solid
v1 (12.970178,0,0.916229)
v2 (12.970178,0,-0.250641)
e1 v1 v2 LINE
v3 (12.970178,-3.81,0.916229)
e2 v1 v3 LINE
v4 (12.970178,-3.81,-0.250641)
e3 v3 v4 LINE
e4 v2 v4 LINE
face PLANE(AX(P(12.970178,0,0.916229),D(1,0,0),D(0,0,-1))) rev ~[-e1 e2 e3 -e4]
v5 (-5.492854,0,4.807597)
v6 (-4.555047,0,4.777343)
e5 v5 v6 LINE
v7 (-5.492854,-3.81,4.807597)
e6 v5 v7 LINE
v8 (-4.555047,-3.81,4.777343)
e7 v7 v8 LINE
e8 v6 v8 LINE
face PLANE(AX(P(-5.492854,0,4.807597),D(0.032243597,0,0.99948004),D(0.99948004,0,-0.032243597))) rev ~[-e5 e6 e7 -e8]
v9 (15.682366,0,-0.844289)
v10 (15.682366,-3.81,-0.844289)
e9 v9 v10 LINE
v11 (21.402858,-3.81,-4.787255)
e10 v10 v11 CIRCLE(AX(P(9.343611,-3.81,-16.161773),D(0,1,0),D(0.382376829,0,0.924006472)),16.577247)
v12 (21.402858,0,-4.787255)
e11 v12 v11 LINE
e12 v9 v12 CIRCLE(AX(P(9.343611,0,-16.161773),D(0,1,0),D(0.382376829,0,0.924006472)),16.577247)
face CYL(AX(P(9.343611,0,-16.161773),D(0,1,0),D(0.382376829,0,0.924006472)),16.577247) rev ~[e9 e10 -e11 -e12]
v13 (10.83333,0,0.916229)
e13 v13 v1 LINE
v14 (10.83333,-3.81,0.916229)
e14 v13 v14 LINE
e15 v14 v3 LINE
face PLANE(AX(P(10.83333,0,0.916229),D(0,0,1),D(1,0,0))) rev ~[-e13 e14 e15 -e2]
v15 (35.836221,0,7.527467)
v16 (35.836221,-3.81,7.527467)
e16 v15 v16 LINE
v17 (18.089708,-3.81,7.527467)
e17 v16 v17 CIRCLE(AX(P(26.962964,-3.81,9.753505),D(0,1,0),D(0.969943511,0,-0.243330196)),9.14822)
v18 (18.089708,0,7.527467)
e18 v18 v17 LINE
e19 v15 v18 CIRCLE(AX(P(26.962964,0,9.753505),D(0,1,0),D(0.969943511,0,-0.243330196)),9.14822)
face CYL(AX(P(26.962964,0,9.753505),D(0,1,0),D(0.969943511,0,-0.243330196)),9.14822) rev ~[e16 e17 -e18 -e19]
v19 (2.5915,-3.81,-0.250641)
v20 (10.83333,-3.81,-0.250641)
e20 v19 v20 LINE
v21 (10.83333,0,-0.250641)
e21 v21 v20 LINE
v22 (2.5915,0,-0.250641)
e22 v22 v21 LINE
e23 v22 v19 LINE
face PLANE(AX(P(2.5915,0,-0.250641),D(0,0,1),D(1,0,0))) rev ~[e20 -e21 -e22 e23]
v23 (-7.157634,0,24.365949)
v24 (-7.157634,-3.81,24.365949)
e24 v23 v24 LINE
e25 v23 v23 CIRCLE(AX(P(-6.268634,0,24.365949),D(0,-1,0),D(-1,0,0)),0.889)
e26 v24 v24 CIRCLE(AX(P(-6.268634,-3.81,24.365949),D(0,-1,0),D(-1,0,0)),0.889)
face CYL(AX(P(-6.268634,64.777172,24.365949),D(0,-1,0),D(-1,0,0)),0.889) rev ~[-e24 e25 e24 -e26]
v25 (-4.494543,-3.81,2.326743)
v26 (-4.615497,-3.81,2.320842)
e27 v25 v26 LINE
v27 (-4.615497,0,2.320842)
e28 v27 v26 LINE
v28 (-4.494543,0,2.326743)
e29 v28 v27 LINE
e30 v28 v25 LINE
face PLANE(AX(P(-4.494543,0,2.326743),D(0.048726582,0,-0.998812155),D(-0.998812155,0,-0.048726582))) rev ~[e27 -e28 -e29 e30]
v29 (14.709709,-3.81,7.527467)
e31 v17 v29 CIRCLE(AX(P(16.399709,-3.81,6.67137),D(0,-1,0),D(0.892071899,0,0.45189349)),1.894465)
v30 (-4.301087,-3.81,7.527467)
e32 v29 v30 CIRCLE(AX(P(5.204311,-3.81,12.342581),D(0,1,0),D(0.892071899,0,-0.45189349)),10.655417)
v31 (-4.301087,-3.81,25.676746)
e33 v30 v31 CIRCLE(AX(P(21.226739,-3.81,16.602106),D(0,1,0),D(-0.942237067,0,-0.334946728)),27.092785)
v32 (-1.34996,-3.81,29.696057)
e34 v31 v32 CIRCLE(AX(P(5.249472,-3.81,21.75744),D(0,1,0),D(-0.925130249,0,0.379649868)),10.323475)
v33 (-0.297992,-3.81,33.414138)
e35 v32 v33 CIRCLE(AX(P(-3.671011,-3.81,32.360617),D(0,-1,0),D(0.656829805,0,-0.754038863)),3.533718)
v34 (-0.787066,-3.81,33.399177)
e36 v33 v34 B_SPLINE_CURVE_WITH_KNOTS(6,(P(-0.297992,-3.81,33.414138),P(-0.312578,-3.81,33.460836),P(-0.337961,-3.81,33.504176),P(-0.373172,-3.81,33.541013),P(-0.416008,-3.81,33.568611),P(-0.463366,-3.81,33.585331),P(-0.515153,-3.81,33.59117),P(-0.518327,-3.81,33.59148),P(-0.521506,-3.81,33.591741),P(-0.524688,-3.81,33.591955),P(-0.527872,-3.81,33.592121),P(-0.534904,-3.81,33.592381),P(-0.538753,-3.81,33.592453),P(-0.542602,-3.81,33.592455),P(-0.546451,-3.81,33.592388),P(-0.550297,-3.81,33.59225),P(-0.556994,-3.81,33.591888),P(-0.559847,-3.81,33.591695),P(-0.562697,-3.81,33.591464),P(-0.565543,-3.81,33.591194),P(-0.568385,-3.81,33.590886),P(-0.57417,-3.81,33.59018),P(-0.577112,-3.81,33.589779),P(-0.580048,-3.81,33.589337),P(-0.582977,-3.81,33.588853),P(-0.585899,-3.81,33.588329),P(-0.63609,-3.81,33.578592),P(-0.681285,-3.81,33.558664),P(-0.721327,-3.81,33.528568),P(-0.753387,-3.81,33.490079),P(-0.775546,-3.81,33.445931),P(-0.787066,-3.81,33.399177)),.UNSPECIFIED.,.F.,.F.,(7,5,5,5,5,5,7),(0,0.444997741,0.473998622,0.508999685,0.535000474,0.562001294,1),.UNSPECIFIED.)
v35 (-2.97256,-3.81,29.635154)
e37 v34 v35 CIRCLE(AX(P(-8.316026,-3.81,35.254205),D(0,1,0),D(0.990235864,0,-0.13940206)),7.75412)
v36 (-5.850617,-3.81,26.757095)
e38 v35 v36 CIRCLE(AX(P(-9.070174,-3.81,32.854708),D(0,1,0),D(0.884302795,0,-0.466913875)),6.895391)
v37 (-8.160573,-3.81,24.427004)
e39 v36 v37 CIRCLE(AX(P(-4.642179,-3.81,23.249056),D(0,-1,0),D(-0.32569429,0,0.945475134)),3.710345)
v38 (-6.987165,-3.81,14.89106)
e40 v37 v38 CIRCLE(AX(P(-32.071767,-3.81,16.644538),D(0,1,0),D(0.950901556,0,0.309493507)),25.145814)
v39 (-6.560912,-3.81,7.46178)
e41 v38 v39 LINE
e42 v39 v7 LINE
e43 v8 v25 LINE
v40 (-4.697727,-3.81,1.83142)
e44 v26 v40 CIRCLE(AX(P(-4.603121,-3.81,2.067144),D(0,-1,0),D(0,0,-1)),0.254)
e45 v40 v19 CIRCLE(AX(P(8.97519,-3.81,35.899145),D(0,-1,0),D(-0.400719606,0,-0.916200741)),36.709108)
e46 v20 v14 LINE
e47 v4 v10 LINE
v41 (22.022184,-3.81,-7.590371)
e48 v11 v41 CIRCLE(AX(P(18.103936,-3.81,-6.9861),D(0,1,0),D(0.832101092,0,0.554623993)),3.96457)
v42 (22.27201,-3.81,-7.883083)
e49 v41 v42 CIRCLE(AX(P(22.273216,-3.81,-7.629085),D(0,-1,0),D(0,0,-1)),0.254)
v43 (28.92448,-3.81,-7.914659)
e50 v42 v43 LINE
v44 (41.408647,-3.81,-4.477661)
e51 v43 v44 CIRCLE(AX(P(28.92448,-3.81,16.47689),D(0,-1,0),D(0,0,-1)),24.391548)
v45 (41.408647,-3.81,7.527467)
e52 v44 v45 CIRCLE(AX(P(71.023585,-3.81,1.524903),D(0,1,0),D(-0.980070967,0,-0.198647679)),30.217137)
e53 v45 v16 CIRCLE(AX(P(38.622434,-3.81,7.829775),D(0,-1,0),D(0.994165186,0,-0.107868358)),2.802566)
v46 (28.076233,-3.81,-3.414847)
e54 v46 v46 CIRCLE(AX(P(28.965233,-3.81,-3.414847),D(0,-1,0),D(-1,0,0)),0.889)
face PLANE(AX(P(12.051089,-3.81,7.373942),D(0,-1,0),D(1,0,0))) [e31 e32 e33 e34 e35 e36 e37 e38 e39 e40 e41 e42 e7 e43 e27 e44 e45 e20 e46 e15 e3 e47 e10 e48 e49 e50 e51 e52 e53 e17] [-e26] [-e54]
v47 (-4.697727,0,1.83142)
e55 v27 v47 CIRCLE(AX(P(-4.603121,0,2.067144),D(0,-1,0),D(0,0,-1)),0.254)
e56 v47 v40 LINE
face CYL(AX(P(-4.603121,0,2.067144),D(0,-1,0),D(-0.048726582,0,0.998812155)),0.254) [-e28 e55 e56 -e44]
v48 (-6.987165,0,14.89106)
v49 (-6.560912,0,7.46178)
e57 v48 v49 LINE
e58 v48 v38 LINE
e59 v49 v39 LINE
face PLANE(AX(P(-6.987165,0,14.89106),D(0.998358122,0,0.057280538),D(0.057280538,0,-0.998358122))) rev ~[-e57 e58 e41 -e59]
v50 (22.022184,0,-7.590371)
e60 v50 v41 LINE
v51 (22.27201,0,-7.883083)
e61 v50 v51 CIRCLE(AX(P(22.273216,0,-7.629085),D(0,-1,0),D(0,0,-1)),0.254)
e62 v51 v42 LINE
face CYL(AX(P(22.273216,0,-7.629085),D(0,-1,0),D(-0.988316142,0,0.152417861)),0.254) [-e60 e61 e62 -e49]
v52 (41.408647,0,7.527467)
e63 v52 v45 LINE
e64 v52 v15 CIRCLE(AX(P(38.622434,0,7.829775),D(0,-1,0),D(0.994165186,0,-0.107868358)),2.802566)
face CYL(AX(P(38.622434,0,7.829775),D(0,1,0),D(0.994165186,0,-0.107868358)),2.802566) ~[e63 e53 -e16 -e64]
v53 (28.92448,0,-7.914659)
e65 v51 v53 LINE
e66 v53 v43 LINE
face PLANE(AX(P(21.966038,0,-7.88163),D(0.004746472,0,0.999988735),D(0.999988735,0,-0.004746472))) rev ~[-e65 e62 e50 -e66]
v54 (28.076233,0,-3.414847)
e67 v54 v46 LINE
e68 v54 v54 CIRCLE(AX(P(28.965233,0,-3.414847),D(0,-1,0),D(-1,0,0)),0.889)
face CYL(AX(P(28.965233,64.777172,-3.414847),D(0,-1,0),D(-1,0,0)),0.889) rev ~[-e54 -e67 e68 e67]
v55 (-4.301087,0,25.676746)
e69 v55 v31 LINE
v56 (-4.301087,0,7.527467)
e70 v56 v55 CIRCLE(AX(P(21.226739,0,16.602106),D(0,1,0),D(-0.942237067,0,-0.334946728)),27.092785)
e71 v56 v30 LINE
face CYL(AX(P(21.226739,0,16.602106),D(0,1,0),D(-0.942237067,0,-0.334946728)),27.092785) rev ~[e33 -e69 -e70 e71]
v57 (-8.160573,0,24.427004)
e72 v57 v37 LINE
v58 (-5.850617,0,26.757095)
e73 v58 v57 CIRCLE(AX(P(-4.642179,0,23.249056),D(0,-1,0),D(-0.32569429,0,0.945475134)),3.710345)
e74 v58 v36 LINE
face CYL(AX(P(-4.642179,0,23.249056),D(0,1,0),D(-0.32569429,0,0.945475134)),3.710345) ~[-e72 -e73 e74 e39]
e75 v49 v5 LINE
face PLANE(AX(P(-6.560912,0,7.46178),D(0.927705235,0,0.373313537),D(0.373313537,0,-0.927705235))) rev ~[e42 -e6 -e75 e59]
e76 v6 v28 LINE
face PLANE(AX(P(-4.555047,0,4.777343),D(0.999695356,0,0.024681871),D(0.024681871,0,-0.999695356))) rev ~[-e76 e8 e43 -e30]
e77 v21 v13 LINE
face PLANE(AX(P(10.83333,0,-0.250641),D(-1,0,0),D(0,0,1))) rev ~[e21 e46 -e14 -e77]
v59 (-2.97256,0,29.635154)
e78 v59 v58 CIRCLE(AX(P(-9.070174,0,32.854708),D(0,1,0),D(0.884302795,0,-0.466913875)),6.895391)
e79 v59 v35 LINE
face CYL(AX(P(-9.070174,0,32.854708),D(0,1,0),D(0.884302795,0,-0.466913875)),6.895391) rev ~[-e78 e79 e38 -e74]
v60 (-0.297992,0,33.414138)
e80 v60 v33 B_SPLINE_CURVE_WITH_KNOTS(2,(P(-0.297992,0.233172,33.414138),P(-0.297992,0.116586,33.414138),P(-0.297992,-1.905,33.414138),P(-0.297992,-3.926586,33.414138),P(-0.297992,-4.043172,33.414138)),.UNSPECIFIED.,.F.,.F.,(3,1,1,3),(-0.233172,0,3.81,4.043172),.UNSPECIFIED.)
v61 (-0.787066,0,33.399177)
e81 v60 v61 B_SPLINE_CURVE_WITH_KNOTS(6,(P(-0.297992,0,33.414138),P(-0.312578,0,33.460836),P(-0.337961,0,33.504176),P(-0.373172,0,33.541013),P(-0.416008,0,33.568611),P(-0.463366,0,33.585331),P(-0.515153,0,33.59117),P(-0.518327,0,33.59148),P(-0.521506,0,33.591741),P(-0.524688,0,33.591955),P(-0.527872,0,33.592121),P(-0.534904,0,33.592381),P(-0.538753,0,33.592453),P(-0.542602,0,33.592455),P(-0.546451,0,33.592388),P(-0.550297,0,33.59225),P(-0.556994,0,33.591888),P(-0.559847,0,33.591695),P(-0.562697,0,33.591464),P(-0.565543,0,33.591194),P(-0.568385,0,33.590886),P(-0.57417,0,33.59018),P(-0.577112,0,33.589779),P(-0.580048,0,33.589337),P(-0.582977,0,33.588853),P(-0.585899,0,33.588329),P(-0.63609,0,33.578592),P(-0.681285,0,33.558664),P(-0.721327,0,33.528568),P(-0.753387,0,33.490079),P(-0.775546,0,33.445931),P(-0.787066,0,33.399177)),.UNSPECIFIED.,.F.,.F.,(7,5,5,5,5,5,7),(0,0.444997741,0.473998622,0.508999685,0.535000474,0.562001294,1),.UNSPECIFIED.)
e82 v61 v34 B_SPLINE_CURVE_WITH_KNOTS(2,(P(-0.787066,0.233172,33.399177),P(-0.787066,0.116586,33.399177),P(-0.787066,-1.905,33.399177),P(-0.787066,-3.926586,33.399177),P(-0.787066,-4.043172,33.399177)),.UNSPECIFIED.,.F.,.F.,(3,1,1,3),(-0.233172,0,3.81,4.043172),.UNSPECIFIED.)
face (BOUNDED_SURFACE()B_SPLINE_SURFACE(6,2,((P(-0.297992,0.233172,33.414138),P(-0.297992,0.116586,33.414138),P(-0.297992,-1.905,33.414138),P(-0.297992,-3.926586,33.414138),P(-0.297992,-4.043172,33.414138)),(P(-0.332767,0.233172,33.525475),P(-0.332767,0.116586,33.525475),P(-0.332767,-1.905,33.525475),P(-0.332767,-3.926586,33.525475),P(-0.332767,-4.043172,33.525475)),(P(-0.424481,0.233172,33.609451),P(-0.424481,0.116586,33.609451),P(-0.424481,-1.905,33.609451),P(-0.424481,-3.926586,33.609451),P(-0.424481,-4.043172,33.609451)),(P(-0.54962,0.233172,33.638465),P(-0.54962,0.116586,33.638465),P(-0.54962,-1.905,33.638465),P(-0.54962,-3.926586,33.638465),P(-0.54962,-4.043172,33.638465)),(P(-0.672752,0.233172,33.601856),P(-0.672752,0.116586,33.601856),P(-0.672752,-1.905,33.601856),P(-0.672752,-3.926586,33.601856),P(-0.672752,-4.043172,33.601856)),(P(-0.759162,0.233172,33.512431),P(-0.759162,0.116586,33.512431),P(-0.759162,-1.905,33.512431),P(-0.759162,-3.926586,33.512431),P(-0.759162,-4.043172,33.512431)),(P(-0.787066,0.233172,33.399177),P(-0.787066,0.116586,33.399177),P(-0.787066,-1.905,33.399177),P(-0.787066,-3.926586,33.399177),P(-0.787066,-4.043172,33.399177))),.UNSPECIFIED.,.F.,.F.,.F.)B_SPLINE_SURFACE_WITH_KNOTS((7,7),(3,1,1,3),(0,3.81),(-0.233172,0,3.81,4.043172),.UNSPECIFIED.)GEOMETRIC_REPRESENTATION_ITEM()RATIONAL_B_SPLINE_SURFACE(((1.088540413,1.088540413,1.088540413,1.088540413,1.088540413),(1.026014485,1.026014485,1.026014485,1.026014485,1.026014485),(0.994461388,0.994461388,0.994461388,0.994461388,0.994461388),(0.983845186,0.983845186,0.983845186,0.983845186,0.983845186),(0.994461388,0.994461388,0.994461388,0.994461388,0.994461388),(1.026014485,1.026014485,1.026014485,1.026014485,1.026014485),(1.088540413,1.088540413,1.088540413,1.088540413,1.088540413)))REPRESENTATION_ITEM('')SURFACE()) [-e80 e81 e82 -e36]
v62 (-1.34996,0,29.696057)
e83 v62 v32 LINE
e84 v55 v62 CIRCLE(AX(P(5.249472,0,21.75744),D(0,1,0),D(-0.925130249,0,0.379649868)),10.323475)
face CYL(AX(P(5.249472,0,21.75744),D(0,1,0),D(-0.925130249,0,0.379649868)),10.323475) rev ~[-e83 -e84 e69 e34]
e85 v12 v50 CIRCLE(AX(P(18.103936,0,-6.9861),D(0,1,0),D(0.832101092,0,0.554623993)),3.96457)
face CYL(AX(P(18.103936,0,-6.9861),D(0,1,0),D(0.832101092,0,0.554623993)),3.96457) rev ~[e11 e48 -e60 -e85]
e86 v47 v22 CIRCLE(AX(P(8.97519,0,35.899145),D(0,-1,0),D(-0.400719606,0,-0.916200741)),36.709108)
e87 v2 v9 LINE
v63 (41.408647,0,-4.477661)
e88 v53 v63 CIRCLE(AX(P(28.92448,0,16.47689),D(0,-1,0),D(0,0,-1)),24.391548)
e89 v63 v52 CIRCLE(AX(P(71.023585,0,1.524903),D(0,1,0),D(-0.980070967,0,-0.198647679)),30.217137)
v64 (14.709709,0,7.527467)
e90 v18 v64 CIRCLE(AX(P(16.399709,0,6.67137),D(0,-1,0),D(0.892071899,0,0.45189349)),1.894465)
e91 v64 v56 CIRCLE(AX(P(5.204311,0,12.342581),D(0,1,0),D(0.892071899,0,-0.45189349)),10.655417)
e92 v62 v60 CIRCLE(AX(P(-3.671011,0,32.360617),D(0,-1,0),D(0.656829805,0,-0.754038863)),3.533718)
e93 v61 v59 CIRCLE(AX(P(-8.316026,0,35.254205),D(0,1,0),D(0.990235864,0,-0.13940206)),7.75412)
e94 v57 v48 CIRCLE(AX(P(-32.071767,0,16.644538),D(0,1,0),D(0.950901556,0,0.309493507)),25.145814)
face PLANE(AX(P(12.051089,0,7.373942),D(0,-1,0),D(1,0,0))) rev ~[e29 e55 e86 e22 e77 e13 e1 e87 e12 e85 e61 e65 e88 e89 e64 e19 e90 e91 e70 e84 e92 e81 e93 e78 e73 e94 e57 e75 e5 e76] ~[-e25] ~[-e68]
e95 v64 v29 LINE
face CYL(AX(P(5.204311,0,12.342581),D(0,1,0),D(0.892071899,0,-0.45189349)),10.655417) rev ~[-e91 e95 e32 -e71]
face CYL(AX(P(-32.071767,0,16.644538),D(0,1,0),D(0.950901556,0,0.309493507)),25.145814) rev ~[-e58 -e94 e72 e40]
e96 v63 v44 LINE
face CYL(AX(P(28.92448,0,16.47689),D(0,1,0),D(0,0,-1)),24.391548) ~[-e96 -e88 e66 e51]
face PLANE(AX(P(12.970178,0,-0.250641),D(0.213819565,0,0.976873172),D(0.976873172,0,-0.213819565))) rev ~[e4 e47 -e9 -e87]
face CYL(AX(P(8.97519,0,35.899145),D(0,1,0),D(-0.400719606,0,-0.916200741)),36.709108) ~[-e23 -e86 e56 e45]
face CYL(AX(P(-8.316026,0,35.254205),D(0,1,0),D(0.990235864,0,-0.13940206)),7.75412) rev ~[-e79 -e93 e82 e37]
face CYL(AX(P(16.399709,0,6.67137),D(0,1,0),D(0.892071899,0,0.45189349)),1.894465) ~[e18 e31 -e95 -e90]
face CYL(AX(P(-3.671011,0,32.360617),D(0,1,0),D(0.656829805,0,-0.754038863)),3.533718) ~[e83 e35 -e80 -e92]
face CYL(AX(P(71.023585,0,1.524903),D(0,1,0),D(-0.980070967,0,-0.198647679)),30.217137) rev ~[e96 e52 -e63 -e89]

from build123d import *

# Parameters (mm, degrees)
F1_DEPTH = 3.81
F2_R     = 0.254
F3_D     = 1.778


# Not quite as in the source:
# - a feature names something its author has since deleted; it is built from what else it names


with BuildPart() as f1:
    # F0 (on Front) → F1 (new body)
    with BuildSketch(Plane.XZ):
        with BuildLine():
            ThreePointArc((41.4086468518, -4.477661373), (40.8064485211, 1.5249027452), (41.4086468518, 7.5274668634))
            ThreePointArc((41.4086468518, 7.5274668634), (38.62243375, 10.6323405578), (35.8362206482, 7.5274668634))
            ThreePointArc((35.8362206482, 7.5274668634), (26.9629642945, 0.6052852493), (18.0897079408, 7.5274668634))
            ThreePointArc((18.0897079408, 7.5274668634), (16.3997087002, 8.5658356165), (14.7097094595, 7.5274668634))
            ThreePointArc((14.7097094595, 7.5274668634), (5.20431123, 1.6871633473), (-4.3010869995, 7.5274668634))
            ThreePointArc((-4.3010869995, 7.5274668634), (-5.8660457098, 16.6021063924), (-4.3010869995, 25.6767459214))
            ThreePointArc((-4.3010869995, 25.6767459214), (-3.0718420066, 27.8672574596), (-1.3499599881, 29.6960566193))
            ThreePointArc((-1.3499599881, 29.6960566193), (-0.1811880249, 31.805372823), (-0.6376186502, 34.1732650995))
            ThreePointArc((-0.6376186502, 34.1732650995), (-1.421034245, 31.7066061173), (-2.9725597706, 29.6351537108))
            ThreePointArc((-2.9725597706, 29.6351537108), (-4.1943946694, 27.9789305778), (-5.8506173082, 26.7570950091))
            ThreePointArc((-5.8506173082, 26.7570950091), (-7.277149178, 25.8612568479), (-8.1605734304, 24.4270041585))
            ThreePointArc((-8.1605734304, 24.4270041585), (-7.1141917577, 19.7155957013), (-6.9871647283, 14.8910596211))
            Line((-6.9871647283, 14.8910596211), (-6.5609117303, 7.4617798516))
            Line((-6.5609117303, 7.4617798516), (-5.4928543977, 4.8075970262))
            Line((-5.4928543977, 4.8075970262), (-4.555047024, 4.7773430124))
            Line((-4.555047024, 4.7773430124), (-4.4945431873, 2.3267425131))
            Line((-4.4945431873, 2.3267425131), (-5.734869279, 2.2662337869))
            ThreePointArc((-5.734869279, 2.2662337869), (-1.646496666, 0.760301383), (2.5915002188, -0.2506414603))
            Line((2.5915002188, -0.2506414603), (10.8333304524, -0.2506414603))
            Line((10.8333304524, -0.2506414603), (10.8333304524, 0.9162292117))
            Line((10.8333304524, 0.9162292117), (12.9701783881, 0.9162292117))
            Line((12.9701783881, 0.9162292117), (12.9701783881, -0.2506414603))
            Line((12.9701783881, -0.2506414603), (15.6823657453, -0.8442893741))
            ThreePointArc((15.6823657453, -0.8442893741), (18.751499307, -2.5127162084), (21.4028581977, -4.7872546129))
            ThreePointArc((21.4028581977, -4.7872546129), (22.004430538, -6.2762052491), (21.9660382718, -7.8816302121))
            Line((21.9660382718, -7.8816302121), (28.9244800806, -7.9146586359))
            ThreePointArc((28.9244800806, -7.9146586359), (35.3988018628, -7.0397169385), (41.4086468518, -4.477661373))
        make_face()
    extrude(amount=F1_DEPTH)

    # F2
    f2_edges = [f1.edges().sort_by_distance(p)[0] for p in [
        (-0.637619, -1.905, 34.173265),
        (21.966038, -1.905, -7.88163),
        (-5.734869, -1.905, 2.266234),
    ]]
    fillet(f2_edges, radius=F2_R)

    # F3 (through all)
    with Locations(Plane(origin=(0, 0, 0), x_dir=(1, 0, 0), z_dir=(0, 1, 0))):
        with Locations((28.9652328938, 3.4148474224), (-6.2686339952, -24.3659485132)):
            Hole(F3_D / 2)


solid = f1.part
